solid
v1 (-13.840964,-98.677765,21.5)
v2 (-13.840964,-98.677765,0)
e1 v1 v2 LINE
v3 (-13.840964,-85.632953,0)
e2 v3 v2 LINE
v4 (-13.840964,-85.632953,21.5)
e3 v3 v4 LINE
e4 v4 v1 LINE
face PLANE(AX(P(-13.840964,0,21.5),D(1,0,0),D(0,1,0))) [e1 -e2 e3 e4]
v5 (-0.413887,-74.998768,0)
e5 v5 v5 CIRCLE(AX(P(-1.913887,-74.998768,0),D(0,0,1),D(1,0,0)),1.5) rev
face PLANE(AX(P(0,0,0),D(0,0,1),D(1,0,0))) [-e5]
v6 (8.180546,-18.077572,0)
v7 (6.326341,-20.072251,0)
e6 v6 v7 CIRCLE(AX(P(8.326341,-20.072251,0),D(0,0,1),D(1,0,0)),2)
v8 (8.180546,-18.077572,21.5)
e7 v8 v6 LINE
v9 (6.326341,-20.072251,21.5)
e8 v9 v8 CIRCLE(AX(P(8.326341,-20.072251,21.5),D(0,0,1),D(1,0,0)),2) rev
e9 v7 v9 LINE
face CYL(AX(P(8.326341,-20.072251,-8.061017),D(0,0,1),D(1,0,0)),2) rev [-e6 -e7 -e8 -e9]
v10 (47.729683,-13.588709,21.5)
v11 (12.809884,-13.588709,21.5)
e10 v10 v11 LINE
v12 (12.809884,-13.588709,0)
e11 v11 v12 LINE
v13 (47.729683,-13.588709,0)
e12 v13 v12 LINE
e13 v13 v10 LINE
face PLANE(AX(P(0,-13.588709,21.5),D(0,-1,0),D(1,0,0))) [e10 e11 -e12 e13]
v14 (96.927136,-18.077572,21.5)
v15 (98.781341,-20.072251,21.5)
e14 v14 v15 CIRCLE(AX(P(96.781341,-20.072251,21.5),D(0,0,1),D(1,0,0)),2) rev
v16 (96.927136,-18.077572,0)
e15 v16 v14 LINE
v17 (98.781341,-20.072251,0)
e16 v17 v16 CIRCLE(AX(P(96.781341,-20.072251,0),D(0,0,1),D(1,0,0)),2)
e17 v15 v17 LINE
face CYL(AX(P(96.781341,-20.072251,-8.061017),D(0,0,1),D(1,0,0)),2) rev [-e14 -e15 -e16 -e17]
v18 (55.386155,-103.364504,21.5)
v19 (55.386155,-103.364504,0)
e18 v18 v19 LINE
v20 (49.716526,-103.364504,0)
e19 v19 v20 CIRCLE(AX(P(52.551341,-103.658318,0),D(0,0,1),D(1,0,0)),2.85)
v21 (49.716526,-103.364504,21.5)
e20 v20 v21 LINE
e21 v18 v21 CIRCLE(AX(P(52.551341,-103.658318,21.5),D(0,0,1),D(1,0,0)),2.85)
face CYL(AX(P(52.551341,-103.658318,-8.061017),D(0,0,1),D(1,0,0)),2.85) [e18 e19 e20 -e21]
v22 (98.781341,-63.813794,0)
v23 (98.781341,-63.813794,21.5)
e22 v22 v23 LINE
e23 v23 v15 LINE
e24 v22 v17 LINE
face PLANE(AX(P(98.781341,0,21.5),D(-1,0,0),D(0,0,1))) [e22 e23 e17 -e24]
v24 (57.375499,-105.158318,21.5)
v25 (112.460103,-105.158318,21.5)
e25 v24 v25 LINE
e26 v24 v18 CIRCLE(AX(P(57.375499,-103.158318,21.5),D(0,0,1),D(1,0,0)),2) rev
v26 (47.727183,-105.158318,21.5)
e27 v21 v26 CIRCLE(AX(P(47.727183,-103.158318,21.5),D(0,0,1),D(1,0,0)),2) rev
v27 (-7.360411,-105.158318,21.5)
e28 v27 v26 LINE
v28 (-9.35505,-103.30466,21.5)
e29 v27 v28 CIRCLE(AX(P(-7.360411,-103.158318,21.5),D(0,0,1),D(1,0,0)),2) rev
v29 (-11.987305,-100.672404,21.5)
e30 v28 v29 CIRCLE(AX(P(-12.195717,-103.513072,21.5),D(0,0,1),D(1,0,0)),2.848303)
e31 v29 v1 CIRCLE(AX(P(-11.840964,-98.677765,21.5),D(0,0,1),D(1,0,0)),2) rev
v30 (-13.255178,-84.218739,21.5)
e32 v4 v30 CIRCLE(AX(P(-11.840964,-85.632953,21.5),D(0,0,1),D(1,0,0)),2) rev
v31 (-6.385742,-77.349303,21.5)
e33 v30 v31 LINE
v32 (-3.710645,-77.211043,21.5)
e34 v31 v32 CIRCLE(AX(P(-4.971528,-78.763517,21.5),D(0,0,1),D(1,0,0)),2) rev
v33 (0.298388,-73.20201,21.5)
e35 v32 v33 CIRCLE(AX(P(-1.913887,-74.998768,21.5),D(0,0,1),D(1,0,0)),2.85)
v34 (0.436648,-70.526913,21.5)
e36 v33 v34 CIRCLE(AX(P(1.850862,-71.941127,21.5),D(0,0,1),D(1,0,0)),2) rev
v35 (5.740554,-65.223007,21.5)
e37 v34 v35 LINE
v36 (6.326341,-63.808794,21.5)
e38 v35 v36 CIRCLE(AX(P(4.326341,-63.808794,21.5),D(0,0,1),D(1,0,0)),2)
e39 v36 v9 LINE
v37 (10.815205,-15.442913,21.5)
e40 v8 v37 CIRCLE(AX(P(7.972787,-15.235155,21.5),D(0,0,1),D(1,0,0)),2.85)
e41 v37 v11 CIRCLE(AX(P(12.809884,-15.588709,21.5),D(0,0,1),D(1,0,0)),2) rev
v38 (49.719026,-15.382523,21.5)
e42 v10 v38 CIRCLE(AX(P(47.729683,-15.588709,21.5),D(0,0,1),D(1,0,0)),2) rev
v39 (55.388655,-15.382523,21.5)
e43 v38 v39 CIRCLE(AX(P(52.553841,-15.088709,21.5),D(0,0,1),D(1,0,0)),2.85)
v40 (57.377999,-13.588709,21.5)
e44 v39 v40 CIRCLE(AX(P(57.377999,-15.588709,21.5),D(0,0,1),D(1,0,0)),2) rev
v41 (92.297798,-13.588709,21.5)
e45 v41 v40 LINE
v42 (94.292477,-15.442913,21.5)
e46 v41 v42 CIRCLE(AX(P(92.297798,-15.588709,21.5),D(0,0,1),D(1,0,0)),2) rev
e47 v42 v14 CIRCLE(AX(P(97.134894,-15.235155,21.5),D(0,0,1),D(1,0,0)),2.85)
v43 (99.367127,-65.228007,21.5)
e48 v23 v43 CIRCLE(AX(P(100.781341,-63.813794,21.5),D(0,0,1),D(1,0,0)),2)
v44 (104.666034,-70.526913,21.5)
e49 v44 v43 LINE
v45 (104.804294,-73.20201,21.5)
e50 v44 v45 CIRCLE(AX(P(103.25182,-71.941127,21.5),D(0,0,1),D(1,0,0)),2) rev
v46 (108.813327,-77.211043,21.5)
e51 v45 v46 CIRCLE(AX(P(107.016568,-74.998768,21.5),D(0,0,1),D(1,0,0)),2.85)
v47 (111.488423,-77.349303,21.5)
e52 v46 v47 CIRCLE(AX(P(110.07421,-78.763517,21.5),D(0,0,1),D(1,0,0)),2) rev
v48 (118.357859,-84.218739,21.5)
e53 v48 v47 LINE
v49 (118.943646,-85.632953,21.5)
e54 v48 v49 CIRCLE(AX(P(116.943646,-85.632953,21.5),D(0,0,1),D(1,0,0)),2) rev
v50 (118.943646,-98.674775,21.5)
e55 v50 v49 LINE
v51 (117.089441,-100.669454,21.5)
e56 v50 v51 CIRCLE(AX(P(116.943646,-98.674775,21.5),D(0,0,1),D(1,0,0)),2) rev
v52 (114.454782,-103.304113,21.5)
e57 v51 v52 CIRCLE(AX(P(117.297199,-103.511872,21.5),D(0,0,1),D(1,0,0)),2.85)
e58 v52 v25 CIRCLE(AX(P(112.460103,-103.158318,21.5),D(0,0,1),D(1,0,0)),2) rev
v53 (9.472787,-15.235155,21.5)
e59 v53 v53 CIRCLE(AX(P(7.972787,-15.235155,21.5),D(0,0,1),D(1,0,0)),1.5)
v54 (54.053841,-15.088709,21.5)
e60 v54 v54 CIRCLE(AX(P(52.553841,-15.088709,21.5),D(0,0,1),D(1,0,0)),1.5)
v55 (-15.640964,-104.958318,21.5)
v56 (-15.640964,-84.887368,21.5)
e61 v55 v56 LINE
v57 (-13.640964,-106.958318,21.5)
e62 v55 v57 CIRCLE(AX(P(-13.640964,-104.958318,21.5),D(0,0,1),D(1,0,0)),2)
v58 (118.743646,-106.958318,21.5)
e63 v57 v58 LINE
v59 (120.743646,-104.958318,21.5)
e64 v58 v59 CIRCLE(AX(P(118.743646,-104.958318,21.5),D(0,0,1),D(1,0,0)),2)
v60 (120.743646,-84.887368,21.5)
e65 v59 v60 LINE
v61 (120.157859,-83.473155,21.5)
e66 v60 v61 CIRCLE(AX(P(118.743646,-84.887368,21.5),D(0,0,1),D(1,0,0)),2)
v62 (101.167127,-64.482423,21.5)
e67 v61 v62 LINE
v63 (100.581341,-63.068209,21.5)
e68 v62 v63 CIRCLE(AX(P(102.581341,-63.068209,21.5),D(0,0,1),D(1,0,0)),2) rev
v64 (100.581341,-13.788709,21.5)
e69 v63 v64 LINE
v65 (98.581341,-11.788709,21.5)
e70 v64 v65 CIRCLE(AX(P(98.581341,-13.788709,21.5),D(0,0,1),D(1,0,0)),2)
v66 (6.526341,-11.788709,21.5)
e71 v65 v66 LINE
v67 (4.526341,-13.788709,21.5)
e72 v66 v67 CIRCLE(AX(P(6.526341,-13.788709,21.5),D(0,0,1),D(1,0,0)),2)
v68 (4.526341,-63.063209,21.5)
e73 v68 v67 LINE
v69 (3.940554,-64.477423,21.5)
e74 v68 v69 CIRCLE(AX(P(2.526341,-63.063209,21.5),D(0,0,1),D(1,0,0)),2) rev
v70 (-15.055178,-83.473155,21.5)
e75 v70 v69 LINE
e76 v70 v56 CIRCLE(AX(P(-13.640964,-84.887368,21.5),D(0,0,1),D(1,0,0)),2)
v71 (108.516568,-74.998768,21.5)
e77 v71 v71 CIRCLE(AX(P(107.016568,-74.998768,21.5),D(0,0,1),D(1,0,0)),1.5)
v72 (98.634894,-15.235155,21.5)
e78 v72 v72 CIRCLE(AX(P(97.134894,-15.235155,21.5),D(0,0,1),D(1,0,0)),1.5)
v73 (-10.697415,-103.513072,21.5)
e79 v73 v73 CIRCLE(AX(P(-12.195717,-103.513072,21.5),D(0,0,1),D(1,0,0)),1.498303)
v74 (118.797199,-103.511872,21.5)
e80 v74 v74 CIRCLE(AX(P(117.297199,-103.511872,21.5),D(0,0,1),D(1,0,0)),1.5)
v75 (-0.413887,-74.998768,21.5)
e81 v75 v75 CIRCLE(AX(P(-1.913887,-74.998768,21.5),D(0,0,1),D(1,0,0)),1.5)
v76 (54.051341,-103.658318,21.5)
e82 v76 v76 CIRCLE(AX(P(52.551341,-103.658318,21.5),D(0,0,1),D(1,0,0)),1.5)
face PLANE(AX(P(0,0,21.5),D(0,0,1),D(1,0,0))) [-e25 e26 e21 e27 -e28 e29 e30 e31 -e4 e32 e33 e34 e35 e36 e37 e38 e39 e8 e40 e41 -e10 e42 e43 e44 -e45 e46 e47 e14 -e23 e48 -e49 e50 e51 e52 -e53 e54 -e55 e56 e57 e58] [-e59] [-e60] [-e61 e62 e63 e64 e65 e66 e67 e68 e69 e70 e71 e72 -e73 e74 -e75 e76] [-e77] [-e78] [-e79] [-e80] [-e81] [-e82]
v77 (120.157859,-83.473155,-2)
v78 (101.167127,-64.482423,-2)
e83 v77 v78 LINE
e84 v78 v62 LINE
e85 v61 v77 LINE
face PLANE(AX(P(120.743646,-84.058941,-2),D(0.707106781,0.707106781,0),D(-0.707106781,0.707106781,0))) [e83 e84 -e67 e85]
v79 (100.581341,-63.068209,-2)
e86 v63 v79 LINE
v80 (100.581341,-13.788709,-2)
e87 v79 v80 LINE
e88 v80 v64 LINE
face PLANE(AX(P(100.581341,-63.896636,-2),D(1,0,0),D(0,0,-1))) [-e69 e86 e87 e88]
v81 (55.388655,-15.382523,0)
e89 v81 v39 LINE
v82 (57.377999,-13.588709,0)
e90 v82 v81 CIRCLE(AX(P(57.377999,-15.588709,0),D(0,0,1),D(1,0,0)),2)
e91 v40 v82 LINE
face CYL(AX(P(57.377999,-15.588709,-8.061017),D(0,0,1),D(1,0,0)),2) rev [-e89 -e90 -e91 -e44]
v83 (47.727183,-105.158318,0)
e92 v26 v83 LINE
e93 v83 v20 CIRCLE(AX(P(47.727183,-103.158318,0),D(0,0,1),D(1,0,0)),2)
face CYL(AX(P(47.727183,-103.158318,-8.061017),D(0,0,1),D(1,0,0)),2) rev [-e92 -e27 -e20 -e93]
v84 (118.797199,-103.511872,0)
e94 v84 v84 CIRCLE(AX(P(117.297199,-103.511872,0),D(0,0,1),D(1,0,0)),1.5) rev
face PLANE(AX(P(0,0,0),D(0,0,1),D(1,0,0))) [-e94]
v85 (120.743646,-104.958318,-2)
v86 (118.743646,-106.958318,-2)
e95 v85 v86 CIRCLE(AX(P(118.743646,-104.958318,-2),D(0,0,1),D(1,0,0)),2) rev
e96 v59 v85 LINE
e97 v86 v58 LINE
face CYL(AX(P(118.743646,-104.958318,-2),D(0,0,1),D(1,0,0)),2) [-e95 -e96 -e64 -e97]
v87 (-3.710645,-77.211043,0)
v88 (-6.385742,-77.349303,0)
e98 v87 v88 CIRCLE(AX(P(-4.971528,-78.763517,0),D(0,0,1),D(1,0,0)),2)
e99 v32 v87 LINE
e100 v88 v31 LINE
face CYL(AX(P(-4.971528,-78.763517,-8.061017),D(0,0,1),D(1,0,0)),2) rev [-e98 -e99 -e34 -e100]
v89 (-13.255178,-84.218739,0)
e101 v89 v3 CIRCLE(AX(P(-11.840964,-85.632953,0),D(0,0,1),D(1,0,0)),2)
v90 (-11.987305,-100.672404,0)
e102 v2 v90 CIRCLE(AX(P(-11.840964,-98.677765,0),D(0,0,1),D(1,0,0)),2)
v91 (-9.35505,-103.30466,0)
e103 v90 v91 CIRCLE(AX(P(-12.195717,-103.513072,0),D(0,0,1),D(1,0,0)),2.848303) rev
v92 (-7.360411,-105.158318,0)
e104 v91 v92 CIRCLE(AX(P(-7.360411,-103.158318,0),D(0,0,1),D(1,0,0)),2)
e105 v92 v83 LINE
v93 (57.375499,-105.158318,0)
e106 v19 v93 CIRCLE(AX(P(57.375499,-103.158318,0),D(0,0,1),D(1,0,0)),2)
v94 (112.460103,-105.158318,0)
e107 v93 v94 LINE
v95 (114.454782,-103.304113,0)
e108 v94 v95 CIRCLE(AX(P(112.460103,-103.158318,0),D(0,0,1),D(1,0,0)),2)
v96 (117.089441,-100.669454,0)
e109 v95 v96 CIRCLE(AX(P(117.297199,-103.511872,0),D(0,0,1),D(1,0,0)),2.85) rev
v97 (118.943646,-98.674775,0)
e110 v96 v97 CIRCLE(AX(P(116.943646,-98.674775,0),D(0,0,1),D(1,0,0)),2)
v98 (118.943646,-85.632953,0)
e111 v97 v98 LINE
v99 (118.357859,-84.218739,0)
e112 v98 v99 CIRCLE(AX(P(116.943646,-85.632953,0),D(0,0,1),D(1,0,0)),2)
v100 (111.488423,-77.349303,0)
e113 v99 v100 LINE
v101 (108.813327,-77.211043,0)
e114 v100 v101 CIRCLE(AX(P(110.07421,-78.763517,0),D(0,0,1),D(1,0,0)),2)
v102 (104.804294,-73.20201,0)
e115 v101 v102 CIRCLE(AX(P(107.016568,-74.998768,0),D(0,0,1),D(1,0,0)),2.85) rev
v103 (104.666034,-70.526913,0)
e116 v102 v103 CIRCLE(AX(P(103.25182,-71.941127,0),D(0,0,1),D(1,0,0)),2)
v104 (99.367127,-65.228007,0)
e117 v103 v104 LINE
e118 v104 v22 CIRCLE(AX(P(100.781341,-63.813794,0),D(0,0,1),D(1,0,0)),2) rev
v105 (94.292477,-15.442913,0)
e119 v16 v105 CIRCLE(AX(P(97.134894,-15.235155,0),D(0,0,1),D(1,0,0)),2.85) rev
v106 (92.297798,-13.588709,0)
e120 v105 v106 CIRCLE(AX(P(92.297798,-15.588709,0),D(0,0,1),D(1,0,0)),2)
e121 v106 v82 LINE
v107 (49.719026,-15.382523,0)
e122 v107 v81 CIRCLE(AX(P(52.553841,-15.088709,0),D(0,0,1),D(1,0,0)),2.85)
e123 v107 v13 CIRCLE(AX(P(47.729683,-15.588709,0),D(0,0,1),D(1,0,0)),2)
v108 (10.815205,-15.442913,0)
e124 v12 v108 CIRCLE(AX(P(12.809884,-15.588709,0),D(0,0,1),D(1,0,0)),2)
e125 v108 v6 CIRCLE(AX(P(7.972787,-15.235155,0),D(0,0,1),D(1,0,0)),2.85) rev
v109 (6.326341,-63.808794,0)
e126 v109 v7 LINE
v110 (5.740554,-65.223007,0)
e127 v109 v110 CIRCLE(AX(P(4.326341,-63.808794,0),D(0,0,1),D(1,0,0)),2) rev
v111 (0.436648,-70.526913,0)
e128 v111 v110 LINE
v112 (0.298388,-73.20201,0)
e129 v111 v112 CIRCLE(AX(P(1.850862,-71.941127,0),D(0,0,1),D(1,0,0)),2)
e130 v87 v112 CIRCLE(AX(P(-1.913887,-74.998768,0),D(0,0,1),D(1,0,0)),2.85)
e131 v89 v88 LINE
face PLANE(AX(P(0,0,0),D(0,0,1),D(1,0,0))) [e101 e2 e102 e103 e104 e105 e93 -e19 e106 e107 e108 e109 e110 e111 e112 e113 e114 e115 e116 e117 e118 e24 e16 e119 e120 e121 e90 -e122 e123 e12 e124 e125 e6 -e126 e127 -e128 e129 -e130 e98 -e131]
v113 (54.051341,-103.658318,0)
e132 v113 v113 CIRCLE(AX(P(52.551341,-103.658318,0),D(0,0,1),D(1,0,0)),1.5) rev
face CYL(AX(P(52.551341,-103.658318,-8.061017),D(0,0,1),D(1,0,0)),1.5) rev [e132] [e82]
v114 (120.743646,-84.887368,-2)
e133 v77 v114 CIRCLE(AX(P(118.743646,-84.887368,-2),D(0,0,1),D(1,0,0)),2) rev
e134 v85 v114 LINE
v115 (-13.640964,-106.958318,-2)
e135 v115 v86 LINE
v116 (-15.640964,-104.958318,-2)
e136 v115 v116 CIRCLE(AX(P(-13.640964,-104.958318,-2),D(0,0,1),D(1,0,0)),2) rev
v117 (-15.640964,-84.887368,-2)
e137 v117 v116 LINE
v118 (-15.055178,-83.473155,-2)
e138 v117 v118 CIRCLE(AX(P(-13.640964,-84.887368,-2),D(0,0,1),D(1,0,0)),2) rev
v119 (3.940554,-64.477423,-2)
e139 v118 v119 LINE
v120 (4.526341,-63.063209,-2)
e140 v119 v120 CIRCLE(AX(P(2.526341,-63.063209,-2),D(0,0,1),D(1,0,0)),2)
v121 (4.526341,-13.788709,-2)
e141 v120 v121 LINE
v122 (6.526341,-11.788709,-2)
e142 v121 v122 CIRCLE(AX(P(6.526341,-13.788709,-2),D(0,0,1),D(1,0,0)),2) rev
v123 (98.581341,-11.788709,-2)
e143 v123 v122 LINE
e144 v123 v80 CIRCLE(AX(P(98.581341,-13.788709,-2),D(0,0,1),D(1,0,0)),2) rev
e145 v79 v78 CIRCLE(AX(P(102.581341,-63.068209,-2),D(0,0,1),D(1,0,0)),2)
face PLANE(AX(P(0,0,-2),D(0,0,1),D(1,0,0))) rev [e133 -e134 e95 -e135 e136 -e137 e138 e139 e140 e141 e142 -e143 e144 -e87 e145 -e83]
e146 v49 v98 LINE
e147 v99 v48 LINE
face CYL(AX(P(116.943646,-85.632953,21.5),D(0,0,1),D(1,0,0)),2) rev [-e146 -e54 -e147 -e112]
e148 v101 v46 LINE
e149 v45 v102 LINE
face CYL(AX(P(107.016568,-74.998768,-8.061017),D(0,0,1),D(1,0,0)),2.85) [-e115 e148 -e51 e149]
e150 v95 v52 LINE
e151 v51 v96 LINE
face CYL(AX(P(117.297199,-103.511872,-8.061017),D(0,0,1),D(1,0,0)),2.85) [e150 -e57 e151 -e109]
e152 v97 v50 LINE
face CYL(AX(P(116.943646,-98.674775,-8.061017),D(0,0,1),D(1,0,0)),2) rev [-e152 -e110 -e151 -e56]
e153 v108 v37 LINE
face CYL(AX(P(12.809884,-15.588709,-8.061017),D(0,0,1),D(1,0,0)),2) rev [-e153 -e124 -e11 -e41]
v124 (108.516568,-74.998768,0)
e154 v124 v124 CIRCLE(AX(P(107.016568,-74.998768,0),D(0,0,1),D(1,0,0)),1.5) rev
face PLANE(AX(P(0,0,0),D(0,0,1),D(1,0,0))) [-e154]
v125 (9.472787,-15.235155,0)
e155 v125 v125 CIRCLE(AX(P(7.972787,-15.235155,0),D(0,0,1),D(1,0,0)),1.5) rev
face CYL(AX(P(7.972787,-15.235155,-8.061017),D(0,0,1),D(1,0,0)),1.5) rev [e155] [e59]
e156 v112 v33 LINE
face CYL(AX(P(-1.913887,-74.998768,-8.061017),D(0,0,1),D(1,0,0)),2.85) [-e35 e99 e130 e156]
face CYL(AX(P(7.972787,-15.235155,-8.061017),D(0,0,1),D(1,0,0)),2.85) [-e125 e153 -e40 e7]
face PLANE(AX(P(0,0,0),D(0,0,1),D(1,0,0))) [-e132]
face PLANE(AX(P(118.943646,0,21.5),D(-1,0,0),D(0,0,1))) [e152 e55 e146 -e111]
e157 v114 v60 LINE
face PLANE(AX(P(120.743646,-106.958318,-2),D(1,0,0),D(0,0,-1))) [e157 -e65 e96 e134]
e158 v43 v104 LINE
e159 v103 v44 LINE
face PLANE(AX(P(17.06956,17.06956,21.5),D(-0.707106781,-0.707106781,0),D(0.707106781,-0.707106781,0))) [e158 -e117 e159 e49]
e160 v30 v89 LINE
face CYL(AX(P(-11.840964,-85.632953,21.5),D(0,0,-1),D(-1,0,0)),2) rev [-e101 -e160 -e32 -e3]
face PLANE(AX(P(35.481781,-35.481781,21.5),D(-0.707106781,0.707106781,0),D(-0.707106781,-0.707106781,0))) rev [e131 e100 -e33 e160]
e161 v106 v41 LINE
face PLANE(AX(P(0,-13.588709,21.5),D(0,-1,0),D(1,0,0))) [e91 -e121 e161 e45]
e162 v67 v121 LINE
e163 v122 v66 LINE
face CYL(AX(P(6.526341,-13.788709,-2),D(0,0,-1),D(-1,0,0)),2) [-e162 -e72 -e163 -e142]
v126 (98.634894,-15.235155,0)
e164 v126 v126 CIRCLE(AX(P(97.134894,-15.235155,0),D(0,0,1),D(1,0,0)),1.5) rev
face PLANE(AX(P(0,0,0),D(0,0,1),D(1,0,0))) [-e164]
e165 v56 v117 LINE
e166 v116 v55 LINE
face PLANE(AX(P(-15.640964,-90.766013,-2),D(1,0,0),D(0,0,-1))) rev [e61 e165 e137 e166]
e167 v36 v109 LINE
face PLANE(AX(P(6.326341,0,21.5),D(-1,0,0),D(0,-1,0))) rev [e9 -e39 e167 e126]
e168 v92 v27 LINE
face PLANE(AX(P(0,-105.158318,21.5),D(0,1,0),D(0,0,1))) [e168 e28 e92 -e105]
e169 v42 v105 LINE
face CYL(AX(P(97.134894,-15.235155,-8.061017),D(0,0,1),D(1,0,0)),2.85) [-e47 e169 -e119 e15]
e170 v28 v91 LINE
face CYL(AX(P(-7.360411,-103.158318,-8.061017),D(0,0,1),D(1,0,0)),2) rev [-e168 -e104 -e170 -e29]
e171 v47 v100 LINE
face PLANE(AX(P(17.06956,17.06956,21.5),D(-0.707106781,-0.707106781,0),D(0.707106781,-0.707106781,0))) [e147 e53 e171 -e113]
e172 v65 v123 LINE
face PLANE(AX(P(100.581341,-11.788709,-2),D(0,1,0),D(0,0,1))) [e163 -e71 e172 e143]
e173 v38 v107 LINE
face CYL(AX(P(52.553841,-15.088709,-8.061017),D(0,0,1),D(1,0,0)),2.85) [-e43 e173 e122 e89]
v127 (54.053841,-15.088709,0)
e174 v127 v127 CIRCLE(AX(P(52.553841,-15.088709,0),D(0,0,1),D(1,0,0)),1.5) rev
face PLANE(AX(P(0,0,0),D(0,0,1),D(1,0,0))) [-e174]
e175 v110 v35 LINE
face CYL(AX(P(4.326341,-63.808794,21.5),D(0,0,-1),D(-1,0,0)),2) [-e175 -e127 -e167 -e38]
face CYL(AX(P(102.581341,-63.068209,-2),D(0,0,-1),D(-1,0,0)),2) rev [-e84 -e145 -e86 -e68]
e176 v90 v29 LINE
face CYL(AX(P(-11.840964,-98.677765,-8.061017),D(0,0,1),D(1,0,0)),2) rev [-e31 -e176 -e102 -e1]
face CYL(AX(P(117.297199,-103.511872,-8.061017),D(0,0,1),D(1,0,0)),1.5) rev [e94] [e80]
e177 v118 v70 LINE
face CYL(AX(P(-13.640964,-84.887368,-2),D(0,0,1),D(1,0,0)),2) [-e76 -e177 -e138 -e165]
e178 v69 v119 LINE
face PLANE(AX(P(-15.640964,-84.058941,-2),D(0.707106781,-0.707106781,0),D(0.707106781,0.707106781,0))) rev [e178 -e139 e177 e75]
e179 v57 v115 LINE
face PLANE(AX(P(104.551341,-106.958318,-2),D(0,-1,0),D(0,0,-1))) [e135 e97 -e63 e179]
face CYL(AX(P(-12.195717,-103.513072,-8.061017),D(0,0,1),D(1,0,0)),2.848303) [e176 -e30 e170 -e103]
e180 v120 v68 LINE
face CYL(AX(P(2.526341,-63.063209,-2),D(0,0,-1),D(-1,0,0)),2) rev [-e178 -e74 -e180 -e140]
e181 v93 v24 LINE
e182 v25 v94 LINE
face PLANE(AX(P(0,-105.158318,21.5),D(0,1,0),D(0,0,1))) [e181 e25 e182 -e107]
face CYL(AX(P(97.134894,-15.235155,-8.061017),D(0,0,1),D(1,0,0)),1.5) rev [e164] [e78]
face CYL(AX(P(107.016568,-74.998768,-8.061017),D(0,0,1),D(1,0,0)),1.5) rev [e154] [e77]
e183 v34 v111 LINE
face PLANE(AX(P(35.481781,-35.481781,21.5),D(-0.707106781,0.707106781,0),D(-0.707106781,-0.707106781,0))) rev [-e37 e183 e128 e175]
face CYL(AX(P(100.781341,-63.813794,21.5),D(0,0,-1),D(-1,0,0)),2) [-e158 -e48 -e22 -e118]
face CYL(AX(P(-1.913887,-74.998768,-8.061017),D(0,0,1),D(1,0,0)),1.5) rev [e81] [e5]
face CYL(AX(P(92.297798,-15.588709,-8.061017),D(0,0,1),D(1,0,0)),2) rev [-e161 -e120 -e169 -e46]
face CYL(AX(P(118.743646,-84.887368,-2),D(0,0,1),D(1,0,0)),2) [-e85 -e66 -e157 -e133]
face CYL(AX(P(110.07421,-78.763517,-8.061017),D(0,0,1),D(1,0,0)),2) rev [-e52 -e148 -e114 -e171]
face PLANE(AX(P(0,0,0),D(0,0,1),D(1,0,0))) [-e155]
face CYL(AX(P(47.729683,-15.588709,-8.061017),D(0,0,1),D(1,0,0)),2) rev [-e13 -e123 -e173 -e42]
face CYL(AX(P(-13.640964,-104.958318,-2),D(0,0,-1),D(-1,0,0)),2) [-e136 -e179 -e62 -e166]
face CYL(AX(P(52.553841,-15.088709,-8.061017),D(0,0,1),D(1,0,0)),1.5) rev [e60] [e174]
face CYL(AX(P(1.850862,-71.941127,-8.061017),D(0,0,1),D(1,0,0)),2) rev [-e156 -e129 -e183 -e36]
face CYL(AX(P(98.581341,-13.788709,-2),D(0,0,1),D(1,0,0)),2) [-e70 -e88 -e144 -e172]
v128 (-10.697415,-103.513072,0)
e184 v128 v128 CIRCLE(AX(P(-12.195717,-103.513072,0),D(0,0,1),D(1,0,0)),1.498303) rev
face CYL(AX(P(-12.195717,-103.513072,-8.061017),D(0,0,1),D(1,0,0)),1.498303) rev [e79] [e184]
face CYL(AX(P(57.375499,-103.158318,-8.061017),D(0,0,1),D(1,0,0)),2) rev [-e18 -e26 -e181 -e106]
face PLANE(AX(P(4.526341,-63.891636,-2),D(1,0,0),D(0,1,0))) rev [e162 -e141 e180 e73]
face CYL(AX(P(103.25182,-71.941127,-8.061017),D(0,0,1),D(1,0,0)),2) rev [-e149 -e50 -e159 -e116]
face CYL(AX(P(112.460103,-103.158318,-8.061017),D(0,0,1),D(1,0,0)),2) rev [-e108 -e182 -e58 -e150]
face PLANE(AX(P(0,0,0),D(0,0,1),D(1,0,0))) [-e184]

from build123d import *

# Parameters (mm, degrees)
BOSS_EXTRUDE1_DEPTH       = 2
BOSS_EXTRUDE2_DEPTH       = 21.5
FILLET1_R                 = 2
FILLET2_R                 = 2
BOSS_EXTRUDE3_START       = -22
BOSS_EXTRUDE3_OUTLINE_R   = 1.498302823
BOSS_EXTRUDE3_OUTLINE_R_2 = 1.5
BOSS_EXTRUDE3_DEPTH       = 22
FILLET3_R                 = 2


with BuildPart() as part:
    # Sketch3 → Boss-Extrude1 (new body)
    with BuildSketch(Plane.XY):
        Polygon((-15.640963985, -84.058941087), (4.526340861, -63.891636241), (4.526340861, -11.788708514), (100.581340861, -11.788708514), (100.581340861, -63.896636241), (120.743645706, -84.058941087), (120.743645706, -106.958318205), (104.551340861, -106.958318205), (-15.640963985, -106.958318205), (-15.640963985, -90.76601336), align=None)
    extrude(amount=-BOSS_EXTRUDE1_DEPTH)

    # Sketch3<3> → Boss-Extrude2 (add)
    with BuildSketch(Plane.XY):
        Polygon((-15.640963985, -90.76601336), (-15.640963985, -84.058941087), (4.526340861, -63.891636241), (4.526340861, -11.788708514), (100.581340861, -11.788708514), (100.581340861, -63.896636241), (120.743645706, -84.058941087), (120.743645706, -106.958318205), (104.551340861, -106.958318205), (-15.640963985, -106.958318205), align=None)
        Polygon((-13.840963985, -90.76601336), (-13.840963985, -105.158318205), (104.551340861, -105.158318205), (118.943645706, -105.158318205), (118.943645706, -84.804525499), (98.781340861, -64.642220653), (98.781340861, -13.588708514), (6.326340861, -13.588708514), (6.326340861, -64.637220653), (-13.840963985, -84.804525499), align=None, mode=Mode.SUBTRACT)
    extrude(amount=BOSS_EXTRUDE2_DEPTH)

    # Fillet1
    fillet1_edges = [part.edges().sort_by_distance(p)[0] for p in [
        (-15.640963985, -84.058941087, 9.75),
        (4.526340861, -63.891636241, 9.75),
        (4.526340861, -11.788708514, 9.75),
        (100.581340861, -11.788708514, 9.75),
        (100.581340861, -63.896636241, 9.75),
        (120.743645706, -84.058941087, 9.75),
        (120.743645706, -106.958318205, 9.75),
        (-15.640963985, -106.958318205, 9.75),
        (-13.840963985, -105.158318205, 10.75),
        (-13.840963985, -84.804525499, 10.75),
        (6.326340861, -64.637220653, 10.75),
        (6.326340861, -13.588708514, 10.75),
        (98.781340861, -13.588708514, 10.75),
        (98.781340861, -64.642220653, 10.75),
        (118.943645706, -105.158318205, 10.75),
    ]]
    fillet(fillet1_edges, radius=FILLET1_R)

    # Fillet2
    fillet2_edges = [part.edges().sort_by_distance(p)[0] for p in [
        (118.943645706, -84.804525499, 10.75),
    ]]
    fillet(fillet2_edges, radius=FILLET2_R)

    # Boss-Extrude3: read off the stored shape, not the designer's step
    # Boss-Extrude3 outline → Boss-Extrude3 (add)
    with BuildSketch(Plane.XY.offset(21.5).offset(BOSS_EXTRUDE3_START)):
        with BuildLine():
            ThreePointArc((101.167127298, -64.482422679), (100.733581796, -63.833575981), (100.581340861, -63.068209116))
            Line((100.581340861, -63.068209116), (100.581340861, -13.788708514))
            ThreePointArc((100.581340861, -13.788708514), (99.995554423, -12.374494952), (98.581340861, -11.788708514))
            Line((98.581340861, -11.788708514), (6.526340861, -11.788708514))
            ThreePointArc((6.526340861, -11.788708514), (5.112127298, -12.374494952), (4.526340861, -13.788708514))
            Line((4.526340861, -13.788708514), (4.526340861, -63.063209116))
            ThreePointArc((4.526340861, -63.063209116), (4.374099926, -63.828575981), (3.940554423, -64.477422679))
            Line((3.940554423, -64.477422679), (-15.055177547, -83.473154649))
            ThreePointArc((-15.055177547, -83.473154649), (-15.48872305, -84.122001347), (-15.640963985, -84.887368211))
            Line((-15.640963985, -84.887368211), (-15.640963985, -104.958318205))
            ThreePointArc((-15.640963985, -104.958318205), (-15.055177547, -106.372531767), (-13.640963985, -106.958318205))
            Line((-13.640963985, -106.958318205), (118.743645706, -106.958318205))
            ThreePointArc((118.743645706, -106.958318205), (120.157859269, -106.372531767), (120.743645706, -104.958318205))
            Line((120.743645706, -104.958318205), (120.743645706, -84.887368211))
            ThreePointArc((120.743645706, -84.887368211), (120.591404771, -84.122001347), (120.157859269, -83.473154649))
            Line((120.157859269, -83.473154649), (101.167127298, -64.482422679))
        make_face()
        with Locations((-12.195717461, -103.513071681)):
            Circle(BOSS_EXTRUDE3_OUTLINE_R, mode=Mode.SUBTRACT)
        with Locations((-1.913886606, -74.998768464)):
            Circle(BOSS_EXTRUDE3_OUTLINE_R_2, mode=Mode.SUBTRACT)
        with Locations((52.551340861, -103.658318205)):
            Circle(BOSS_EXTRUDE3_OUTLINE_R_2, mode=Mode.SUBTRACT)
        with Locations((117.297199097, -103.511871596)):
            Circle(BOSS_EXTRUDE3_OUTLINE_R_2, mode=Mode.SUBTRACT)
        with Locations((107.016568327, -74.998768464)):
            Circle(BOSS_EXTRUDE3_OUTLINE_R_2, mode=Mode.SUBTRACT)
        with BuildLine():
            ThreePointArc((-13.840963985, -85.632952624), (-13.68872305, -84.867585759), (-13.255177547, -84.218739061))
            Line((-13.255177547, -84.218739061), (-4.688095726, -75.651657241))
            ThreePointArc((-4.688095726, -75.651657241), (0.101367721, -77.01402279), (-1.260997829, -72.224559343))
            Line((-1.260997829, -72.224559343), (5.740554423, -65.223007091))
            ThreePointArc((5.740554423, -65.223007091), (6.174099926, -64.574160393), (6.326340861, -63.808793529))
            Line((6.326340861, -63.808793529), (6.326340861, -17.561464123))
            ThreePointArc((6.326340861, -17.561464123), (9.988041797, -17.25040945), (10.29909647, -13.588708514))
            Line((10.29909647, -13.588708514), (50.130516698, -13.588708514))
            ThreePointArc((50.130516698, -13.588708514), (52.553840861, -17.938708514), (54.977165024, -13.588708514))
            Line((54.977165024, -13.588708514), (94.808585252, -13.588708514))
            ThreePointArc((94.808585252, -13.588708514), (95.119639925, -17.25040945), (98.781340861, -17.561464123))
            Line((98.781340861, -17.561464123), (98.781340861, -63.813793529))
            ThreePointArc((98.781340861, -63.813793529), (98.933581796, -64.579160393), (99.367127298, -65.228007091))
            Line((99.367127298, -65.228007091), (106.36367955, -72.224559343))
            ThreePointArc((106.36367955, -72.224559343), (105.001314001, -77.01402279), (109.790777448, -75.651657241))
            Line((109.790777448, -75.651657241), (118.357859269, -84.218739061))
            ThreePointArc((118.357859269, -84.218739061), (118.791404771, -84.867585759), (118.943645706, -85.632952624))
            Line((118.943645706, -85.632952624), (118.943645706, -101.185562596))
            ThreePointArc((118.943645706, -101.185562596), (115.28194477, -101.496617269), (114.970890097, -105.158318205))
            Line((114.970890097, -105.158318205), (54.974665024, -105.158318205))
            ThreePointArc((54.974665024, -105.158318205), (52.551340861, -100.808318205), (50.128016698, -105.158318205))
            Line((50.128016698, -105.158318205), (-9.870638356, -105.158318205))
            ThreePointArc((-9.870638356, -105.158318205), (-10.18166322, -101.49901744), (-13.840963985, -101.187992576))
            Line((-13.840963985, -101.187992576), (-13.840963985, -85.632952624))
        make_face(mode=Mode.SUBTRACT)
        with Locations((7.97278747, -15.235155124)):
            Circle(BOSS_EXTRUDE3_OUTLINE_R_2, mode=Mode.SUBTRACT)
        with Locations((52.553840861, -15.088708514)):
            Circle(BOSS_EXTRUDE3_OUTLINE_R_2, mode=Mode.SUBTRACT)
        with Locations((97.134894251, -15.235155124)):
            Circle(BOSS_EXTRUDE3_OUTLINE_R_2, mode=Mode.SUBTRACT)
    extrude(amount=BOSS_EXTRUDE3_DEPTH)

    # Fillet3
    fillet3_edges = [part.edges().sort_by_distance(p)[0] for p in [
        (10.29909647, -13.588708514, 10.75),
        (6.326340861, -17.561464123, 10.75),
        (54.977165024, -13.588708514, 10.75),
        (50.130516698, -13.588708514, 10.75),
        (94.808585252, -13.588708514, 10.75),
        (98.781340861, -17.561464123, 10.75),
        (109.790777448, -75.651657241, 10.75),
        (106.36367955, -72.224559343, 10.75),
        (118.943645706, -101.185562596, 10.75),
        (114.970890097, -105.158318205, 10.75),
        (50.128016698, -105.158318205, 10.75),
        (54.974665024, -105.158318205, 10.75),
        (-9.870638356, -105.158318205, 10.75),
        (-13.840963985, -101.187992576, 10.75),
        (-4.688095726, -75.651657241, 10.75),
        (-1.260997829, -72.224559343, 10.75),
    ]]
    fillet(fillet3_edges, radius=FILLET3_R)


solid = part.part
